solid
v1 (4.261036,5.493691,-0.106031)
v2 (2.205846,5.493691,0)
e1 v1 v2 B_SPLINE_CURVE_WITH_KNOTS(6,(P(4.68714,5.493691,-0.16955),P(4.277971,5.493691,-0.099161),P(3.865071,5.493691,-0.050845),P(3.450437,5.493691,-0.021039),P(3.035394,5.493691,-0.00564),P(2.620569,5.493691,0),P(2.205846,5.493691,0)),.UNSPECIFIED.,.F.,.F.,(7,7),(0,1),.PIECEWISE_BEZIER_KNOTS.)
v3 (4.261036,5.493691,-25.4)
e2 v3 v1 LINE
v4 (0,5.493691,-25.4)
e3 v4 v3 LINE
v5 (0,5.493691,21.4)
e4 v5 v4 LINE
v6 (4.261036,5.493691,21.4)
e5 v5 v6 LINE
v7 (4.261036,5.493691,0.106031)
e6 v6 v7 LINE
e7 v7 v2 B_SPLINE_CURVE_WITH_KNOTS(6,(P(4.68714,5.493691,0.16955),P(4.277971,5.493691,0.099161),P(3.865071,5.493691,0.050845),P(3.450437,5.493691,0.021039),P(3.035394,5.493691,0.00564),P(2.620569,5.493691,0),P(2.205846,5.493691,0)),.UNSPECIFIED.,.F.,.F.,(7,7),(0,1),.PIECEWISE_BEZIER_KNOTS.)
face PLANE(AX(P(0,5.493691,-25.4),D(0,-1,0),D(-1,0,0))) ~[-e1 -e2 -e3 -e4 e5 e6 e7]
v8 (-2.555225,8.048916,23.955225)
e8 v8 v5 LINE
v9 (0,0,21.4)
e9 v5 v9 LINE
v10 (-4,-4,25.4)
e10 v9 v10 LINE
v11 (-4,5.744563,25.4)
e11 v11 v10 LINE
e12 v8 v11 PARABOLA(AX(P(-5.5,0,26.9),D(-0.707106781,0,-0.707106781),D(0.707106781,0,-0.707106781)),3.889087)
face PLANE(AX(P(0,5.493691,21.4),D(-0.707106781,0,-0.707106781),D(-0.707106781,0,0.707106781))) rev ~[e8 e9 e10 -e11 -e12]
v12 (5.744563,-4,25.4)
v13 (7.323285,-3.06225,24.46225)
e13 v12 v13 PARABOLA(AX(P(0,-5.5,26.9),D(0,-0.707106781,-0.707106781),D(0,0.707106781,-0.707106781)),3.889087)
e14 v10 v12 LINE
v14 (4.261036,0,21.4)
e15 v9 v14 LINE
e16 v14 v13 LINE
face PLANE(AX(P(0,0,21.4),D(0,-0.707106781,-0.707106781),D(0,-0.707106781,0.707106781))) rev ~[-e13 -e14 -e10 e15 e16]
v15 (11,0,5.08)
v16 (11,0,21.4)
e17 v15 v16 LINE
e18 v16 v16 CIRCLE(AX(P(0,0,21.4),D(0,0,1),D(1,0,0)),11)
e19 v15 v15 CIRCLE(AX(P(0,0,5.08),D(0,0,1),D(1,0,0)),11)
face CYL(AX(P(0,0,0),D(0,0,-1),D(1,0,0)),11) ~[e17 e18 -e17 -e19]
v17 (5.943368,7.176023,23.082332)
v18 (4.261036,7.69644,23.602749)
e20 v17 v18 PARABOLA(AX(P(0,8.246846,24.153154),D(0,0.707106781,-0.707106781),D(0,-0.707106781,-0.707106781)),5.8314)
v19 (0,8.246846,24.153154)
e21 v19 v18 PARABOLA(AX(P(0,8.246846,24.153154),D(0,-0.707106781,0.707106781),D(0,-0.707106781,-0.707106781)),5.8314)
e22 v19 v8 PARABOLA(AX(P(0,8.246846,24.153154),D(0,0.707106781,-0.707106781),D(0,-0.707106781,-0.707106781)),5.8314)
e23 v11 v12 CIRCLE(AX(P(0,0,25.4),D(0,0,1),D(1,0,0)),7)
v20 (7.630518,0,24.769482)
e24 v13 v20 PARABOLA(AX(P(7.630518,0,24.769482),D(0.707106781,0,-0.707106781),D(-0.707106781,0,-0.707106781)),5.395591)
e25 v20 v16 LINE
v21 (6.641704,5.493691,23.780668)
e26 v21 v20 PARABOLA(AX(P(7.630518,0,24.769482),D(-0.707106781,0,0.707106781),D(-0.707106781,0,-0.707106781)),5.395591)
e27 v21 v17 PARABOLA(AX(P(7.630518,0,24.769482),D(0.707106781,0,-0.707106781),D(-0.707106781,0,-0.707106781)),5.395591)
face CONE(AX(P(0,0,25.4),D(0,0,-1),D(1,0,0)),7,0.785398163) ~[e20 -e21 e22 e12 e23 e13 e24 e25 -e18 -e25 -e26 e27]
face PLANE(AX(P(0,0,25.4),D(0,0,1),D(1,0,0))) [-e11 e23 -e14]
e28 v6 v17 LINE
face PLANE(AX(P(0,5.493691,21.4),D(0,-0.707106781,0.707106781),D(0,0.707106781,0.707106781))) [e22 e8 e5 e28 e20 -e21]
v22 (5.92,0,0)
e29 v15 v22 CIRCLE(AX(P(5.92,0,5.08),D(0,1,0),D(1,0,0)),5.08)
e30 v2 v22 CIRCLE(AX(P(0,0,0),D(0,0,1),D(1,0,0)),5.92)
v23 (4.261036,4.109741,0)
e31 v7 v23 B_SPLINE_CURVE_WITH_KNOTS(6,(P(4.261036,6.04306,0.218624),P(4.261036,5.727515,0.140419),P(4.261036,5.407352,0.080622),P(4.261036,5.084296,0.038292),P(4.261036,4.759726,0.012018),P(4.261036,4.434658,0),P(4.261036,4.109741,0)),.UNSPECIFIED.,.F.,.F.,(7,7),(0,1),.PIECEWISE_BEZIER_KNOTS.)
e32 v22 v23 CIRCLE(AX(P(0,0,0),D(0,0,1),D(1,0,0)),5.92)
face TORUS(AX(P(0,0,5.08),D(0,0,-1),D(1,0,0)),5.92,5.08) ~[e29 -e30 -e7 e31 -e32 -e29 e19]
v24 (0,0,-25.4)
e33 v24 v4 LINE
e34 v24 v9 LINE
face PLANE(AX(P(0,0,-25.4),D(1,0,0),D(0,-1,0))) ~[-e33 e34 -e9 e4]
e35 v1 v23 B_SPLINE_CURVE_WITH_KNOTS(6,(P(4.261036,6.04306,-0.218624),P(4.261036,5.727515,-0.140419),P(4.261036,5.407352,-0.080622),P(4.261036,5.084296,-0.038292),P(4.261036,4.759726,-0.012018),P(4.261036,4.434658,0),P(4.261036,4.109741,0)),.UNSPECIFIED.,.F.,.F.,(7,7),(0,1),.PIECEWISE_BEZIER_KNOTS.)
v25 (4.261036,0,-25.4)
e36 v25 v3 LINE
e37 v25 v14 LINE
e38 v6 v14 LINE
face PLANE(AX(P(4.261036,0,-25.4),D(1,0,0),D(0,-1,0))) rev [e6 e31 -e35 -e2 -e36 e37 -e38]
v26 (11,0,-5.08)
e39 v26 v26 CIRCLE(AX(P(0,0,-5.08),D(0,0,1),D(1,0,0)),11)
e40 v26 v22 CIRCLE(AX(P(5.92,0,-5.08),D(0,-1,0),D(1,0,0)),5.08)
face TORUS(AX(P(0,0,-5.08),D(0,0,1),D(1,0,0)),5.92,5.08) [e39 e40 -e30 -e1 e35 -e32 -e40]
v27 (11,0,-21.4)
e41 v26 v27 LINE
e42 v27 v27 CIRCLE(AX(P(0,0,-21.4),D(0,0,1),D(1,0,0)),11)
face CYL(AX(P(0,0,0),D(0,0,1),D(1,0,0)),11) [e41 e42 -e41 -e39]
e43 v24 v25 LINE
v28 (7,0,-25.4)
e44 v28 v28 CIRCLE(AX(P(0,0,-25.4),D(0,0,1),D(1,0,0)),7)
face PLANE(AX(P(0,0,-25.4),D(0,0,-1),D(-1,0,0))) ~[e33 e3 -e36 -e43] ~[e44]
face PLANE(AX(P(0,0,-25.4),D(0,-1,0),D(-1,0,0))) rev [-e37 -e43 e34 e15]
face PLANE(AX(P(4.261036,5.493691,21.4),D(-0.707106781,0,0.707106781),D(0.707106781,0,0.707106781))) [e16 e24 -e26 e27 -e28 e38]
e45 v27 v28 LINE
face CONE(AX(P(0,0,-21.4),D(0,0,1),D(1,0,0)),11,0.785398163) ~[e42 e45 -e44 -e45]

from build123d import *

# Parameters (mm, degrees)
F0_R         = 11
F1_DEPTH     = 25.4
F2_W         = 4.2610359378
F2_H         = 5.4936911911
F1_FACE1_R   = 11
F3_DEPTH     = 25.401
F6_SIZE      = 4
F7_T1_DEPTH  = 5.4936911911
F7_T3_DEPTH  = 4.2610359378
F7_T11_DEPTH = 15.7804231429
F7_S13_R     = 11
F7_T14_DEPTH = 10
F7_T17_DEPTH = 14.5477678897
F7_S19_R     = 11
F7_T20_DEPTH = 9
F7_T26_DEPTH = 15.7804231429
F7_T30_DEPTH = 14.5477678897
F7_T37_DEPTH = 14.5477678897
F7_S39_R     = 11
F7_T40_DEPTH = 9
F7_T43_DEPTH = 15.7804231429
F7_S45_R     = 11
F7_T46_DEPTH = 10
F7_T52_DEPTH = 15.7804231429
F7_S54_R     = 11
F7_T55_DEPTH = 10
F7_T58_DEPTH = 14.5477678897
F7_S60_R     = 11
F7_T61_DEPTH = 9


# Not quite as in the source:
# - a fillet or chamfer that OpenCascade refuses, or shapes differently, is made with other operations: its cross-section is extruded or revolved along the edge and cut away or added


with BuildPart() as f1:
    # F0 (on Top) → F1 (new body)
    with BuildSketch(Plane.XY):
        Circle(F0_R)
    extrude(amount=F1_DEPTH)

    # F2 (on face) + F1_face1 (on face) → F3 (cut, through all)
    with BuildSketch(Plane.XY.offset(25.4)):
        with Locations((2.1305179689, 2.7468455955)):
            Rectangle(F2_W, F2_H)
    with BuildSketch(Plane(origin=(0, 0, 0), x_dir=(1, 0, 0), z_dir=(0, 0, -1))):
        Circle(F1_FACE1_R)
    extrude(amount=-F3_DEPTH, dir=(0, 0, 1), mode=Mode.SUBTRACT)

    # F4: fillet of radius 5.08 on 1 edges, made by hand

    # F4_s1 → F4_t2 (revolve, cut)
    with BuildSketch(Plane.XZ):
        with BuildLine():
            ThreePointArc((11, 5.08), (9.5121024484, 1.4878975516), (5.92, 0))
            Line((5.92, 0), (11, 0))
            Line((11, 0), (11, 5.08))
        make_face()
    revolve(axis=Axis((0, 0, 0), (0, 0, 1)), mode=Mode.SUBTRACT)

    # F5: F1 across face


with BuildPart() as f1_1:
    add(f1.part)
    add(f1.part.mirror(Plane(origin=(-0.5175939516, -0.6620763979, 0), x_dir=(1, 0, 0), z_dir=(0, 0, -1))))

    # F6
    f6_edges = [f1_1.edges().sort_by_distance(p)[0] for p in [
        (-11, 0, -25.4),
    ]]
    chamfer(f6_edges, length=F6_SIZE)

    # F7: chamfer of 4 on 5 edges, made by hand

    # F7_s2 → F7_t1 (cut)
    with BuildSketch(Plane.XZ.offset(-5.4936911911)):
        Polygon((0, 21.4), (-4, 25.4), (0, 25.4), align=None)
        Polygon((4.2610359378, 21.4), (8.2610359378, 25.4), (4.2610359378, 25.4), align=None)
    extrude(amount=F7_T1_DEPTH, mode=Mode.SUBTRACT)

    # F7_s4 → F7_t3 (cut)
    with BuildSketch(Plane.YZ):
        Polygon((0, 21.4), (-4, 25.4), (0, 25.4), align=None)
        Polygon((5.4936911911, 21.4), (9.4936911911, 25.4), (5.4936911911, 25.4), align=None)
    extrude(amount=F7_T3_DEPTH, mode=Mode.SUBTRACT)

    # F7_s5 → F7_t6 (revolve, cut)
    with BuildSketch(Plane.XZ):
        Polygon((7, 25.4), (11, 21.4), (11, 25.4), align=None)
    revolve(axis=Axis((0, 0, 25.4), (0, 0, 1)), mode=Mode.SUBTRACT)


with BuildPart() as f7_tool9:
    # F7_s10 → F7_t11 (new body)
    with BuildSketch(Plane.XZ.offset(-15.7804231429)):
        Polygon((0, 21.4), (-4, 25.4), (0, 25.4), align=None)
    extrude(amount=F7_T11_DEPTH)

    split(bisect_by=Plane.XZ.offset(-5.4936911911), keep=Keep.BOTTOM)

    # F7_s13 → F7_t14 (intersect, symmetric)
    with BuildSketch(Plane.XY.offset(23.4)):
        Circle(F7_S13_R)
    extrude(amount=F7_T14_DEPTH, both=True, mode=Mode.INTERSECT)


with BuildPart() as f7_tool15:
    # F7_s16 → F7_t17 (new body)
    with BuildSketch(Plane.YZ.offset(4.2610359378)):
        Polygon((5.4936911911, 21.4), (9.4936911911, 25.4), (5.4936911911, 25.4), align=None)
    extrude(amount=-F7_T17_DEPTH)

    split(bisect_by=Plane.YZ, keep=Keep.BOTTOM)

    # F7_s19 → F7_t20 (intersect, symmetric)
    with BuildSketch(Plane.XY.offset(23.4)):
        Circle(F7_S19_R)
    extrude(amount=F7_T20_DEPTH, both=True, mode=Mode.INTERSECT)


with BuildPart() as f7_tool9_1:
    add(f7_tool9.part)

    # F7_t21: intersect F7_tool15
    add(f7_tool15.part, mode=Mode.INTERSECT)


with BuildPart() as f1_2:
    add(f1_1.part)

    # F7_t7: cut F7_tool9
    add(f7_tool9_1.part, mode=Mode.SUBTRACT)


with BuildPart() as f7_tool24:
    # F7_s25 → F7_t26 (new body)
    with BuildSketch(Plane.XZ.offset(-5.4936911911)):
        Polygon((0, 21.4), (-4, 25.4), (0, 25.4), align=None)
    extrude(amount=F7_T26_DEPTH)

    split(bisect_by=Plane.XZ, keep=Keep.TOP)


with BuildPart() as f7_tool28:
    # F7_s29 → F7_t30 (new body)
    with BuildSketch(Plane.YZ.offset(-10.2867319519)):
        Polygon((0, 21.4), (-4, 25.4), (0, 25.4), align=None)
    extrude(amount=F7_T30_DEPTH)

    split(bisect_by=Plane.YZ, keep=Keep.BOTTOM)


with BuildPart() as f7_tool24_1:
    add(f7_tool24.part)

    # F7_t32: intersect F7_tool28
    add(f7_tool28.part, mode=Mode.INTERSECT)


with BuildPart() as f1_3:
    add(f1_2.part)

    # F7_t22: cut F7_tool24
    add(f7_tool24_1.part, mode=Mode.SUBTRACT)


with BuildPart() as f7_tool35:
    # F7_s36 → F7_t37 (new body)
    with BuildSketch(Plane.YZ):
        Polygon((0, 21.4), (-4, 25.4), (0, 25.4), align=None)
    extrude(amount=F7_T37_DEPTH)

    split(bisect_by=Plane.YZ.offset(4.2610359378), keep=Keep.TOP)

    # F7_s39 → F7_t40 (intersect, symmetric)
    with BuildSketch(Plane.XY.offset(23.4)):
        Circle(F7_S39_R)
    extrude(amount=F7_T40_DEPTH, both=True, mode=Mode.INTERSECT)


with BuildPart() as f7_tool41:
    # F7_s42 → F7_t43 (new body)
    with BuildSketch(Plane.XZ.offset(10.2867319519)):
        Polygon((4.2610359378, 21.4), (8.2610359378, 25.4), (4.2610359378, 25.4), align=None)
    extrude(amount=-F7_T43_DEPTH)

    split(bisect_by=Plane.XZ, keep=Keep.TOP)

    # F7_s45 → F7_t46 (intersect, symmetric)
    with BuildSketch(Plane.XY.offset(23.4)):
        Circle(F7_S45_R)
    extrude(amount=F7_T46_DEPTH, both=True, mode=Mode.INTERSECT)


with BuildPart() as f7_tool35_1:
    add(f7_tool35.part)

    # F7_t47: intersect F7_tool41
    add(f7_tool41.part, mode=Mode.INTERSECT)


with BuildPart() as f1_4:
    add(f1_3.part)

    # F7_t33: cut F7_tool35
    add(f7_tool35_1.part, mode=Mode.SUBTRACT)


with BuildPart() as f7_tool50:
    # F7_s51 → F7_t52 (new body)
    with BuildSketch(Plane.XZ):
        Polygon((4.2610359378, 21.4), (8.2610359378, 25.4), (4.2610359378, 25.4), align=None)
    extrude(amount=-F7_T52_DEPTH)

    split(bisect_by=Plane.XZ.offset(-5.4936911911), keep=Keep.BOTTOM)

    # F7_s54 → F7_t55 (intersect, symmetric)
    with BuildSketch(Plane.XY.offset(23.4)):
        Circle(F7_S54_R)
    extrude(amount=F7_T55_DEPTH, both=True, mode=Mode.INTERSECT)


with BuildPart() as f7_tool56:
    # F7_s57 → F7_t58 (new body)
    with BuildSketch(Plane.YZ.offset(14.5477678897)):
        Polygon((5.4936911911, 21.4), (9.4936911911, 25.4), (5.4936911911, 25.4), align=None)
    extrude(amount=-F7_T58_DEPTH)

    split(bisect_by=Plane.YZ.offset(4.2610359378), keep=Keep.TOP)

    # F7_s60 → F7_t61 (intersect, symmetric)
    with BuildSketch(Plane.XY.offset(23.4)):
        Circle(F7_S60_R)
    extrude(amount=F7_T61_DEPTH, both=True, mode=Mode.INTERSECT)


with BuildPart() as f7_tool50_1:
    add(f7_tool50.part)

    # F7_t62: intersect F7_tool56
    add(f7_tool56.part, mode=Mode.INTERSECT)


with BuildPart() as f1_5:
    add(f1_4.part)

    # F7_t48: cut F7_tool50
    add(f7_tool50_1.part, mode=Mode.SUBTRACT)


solid = f1_5.part
